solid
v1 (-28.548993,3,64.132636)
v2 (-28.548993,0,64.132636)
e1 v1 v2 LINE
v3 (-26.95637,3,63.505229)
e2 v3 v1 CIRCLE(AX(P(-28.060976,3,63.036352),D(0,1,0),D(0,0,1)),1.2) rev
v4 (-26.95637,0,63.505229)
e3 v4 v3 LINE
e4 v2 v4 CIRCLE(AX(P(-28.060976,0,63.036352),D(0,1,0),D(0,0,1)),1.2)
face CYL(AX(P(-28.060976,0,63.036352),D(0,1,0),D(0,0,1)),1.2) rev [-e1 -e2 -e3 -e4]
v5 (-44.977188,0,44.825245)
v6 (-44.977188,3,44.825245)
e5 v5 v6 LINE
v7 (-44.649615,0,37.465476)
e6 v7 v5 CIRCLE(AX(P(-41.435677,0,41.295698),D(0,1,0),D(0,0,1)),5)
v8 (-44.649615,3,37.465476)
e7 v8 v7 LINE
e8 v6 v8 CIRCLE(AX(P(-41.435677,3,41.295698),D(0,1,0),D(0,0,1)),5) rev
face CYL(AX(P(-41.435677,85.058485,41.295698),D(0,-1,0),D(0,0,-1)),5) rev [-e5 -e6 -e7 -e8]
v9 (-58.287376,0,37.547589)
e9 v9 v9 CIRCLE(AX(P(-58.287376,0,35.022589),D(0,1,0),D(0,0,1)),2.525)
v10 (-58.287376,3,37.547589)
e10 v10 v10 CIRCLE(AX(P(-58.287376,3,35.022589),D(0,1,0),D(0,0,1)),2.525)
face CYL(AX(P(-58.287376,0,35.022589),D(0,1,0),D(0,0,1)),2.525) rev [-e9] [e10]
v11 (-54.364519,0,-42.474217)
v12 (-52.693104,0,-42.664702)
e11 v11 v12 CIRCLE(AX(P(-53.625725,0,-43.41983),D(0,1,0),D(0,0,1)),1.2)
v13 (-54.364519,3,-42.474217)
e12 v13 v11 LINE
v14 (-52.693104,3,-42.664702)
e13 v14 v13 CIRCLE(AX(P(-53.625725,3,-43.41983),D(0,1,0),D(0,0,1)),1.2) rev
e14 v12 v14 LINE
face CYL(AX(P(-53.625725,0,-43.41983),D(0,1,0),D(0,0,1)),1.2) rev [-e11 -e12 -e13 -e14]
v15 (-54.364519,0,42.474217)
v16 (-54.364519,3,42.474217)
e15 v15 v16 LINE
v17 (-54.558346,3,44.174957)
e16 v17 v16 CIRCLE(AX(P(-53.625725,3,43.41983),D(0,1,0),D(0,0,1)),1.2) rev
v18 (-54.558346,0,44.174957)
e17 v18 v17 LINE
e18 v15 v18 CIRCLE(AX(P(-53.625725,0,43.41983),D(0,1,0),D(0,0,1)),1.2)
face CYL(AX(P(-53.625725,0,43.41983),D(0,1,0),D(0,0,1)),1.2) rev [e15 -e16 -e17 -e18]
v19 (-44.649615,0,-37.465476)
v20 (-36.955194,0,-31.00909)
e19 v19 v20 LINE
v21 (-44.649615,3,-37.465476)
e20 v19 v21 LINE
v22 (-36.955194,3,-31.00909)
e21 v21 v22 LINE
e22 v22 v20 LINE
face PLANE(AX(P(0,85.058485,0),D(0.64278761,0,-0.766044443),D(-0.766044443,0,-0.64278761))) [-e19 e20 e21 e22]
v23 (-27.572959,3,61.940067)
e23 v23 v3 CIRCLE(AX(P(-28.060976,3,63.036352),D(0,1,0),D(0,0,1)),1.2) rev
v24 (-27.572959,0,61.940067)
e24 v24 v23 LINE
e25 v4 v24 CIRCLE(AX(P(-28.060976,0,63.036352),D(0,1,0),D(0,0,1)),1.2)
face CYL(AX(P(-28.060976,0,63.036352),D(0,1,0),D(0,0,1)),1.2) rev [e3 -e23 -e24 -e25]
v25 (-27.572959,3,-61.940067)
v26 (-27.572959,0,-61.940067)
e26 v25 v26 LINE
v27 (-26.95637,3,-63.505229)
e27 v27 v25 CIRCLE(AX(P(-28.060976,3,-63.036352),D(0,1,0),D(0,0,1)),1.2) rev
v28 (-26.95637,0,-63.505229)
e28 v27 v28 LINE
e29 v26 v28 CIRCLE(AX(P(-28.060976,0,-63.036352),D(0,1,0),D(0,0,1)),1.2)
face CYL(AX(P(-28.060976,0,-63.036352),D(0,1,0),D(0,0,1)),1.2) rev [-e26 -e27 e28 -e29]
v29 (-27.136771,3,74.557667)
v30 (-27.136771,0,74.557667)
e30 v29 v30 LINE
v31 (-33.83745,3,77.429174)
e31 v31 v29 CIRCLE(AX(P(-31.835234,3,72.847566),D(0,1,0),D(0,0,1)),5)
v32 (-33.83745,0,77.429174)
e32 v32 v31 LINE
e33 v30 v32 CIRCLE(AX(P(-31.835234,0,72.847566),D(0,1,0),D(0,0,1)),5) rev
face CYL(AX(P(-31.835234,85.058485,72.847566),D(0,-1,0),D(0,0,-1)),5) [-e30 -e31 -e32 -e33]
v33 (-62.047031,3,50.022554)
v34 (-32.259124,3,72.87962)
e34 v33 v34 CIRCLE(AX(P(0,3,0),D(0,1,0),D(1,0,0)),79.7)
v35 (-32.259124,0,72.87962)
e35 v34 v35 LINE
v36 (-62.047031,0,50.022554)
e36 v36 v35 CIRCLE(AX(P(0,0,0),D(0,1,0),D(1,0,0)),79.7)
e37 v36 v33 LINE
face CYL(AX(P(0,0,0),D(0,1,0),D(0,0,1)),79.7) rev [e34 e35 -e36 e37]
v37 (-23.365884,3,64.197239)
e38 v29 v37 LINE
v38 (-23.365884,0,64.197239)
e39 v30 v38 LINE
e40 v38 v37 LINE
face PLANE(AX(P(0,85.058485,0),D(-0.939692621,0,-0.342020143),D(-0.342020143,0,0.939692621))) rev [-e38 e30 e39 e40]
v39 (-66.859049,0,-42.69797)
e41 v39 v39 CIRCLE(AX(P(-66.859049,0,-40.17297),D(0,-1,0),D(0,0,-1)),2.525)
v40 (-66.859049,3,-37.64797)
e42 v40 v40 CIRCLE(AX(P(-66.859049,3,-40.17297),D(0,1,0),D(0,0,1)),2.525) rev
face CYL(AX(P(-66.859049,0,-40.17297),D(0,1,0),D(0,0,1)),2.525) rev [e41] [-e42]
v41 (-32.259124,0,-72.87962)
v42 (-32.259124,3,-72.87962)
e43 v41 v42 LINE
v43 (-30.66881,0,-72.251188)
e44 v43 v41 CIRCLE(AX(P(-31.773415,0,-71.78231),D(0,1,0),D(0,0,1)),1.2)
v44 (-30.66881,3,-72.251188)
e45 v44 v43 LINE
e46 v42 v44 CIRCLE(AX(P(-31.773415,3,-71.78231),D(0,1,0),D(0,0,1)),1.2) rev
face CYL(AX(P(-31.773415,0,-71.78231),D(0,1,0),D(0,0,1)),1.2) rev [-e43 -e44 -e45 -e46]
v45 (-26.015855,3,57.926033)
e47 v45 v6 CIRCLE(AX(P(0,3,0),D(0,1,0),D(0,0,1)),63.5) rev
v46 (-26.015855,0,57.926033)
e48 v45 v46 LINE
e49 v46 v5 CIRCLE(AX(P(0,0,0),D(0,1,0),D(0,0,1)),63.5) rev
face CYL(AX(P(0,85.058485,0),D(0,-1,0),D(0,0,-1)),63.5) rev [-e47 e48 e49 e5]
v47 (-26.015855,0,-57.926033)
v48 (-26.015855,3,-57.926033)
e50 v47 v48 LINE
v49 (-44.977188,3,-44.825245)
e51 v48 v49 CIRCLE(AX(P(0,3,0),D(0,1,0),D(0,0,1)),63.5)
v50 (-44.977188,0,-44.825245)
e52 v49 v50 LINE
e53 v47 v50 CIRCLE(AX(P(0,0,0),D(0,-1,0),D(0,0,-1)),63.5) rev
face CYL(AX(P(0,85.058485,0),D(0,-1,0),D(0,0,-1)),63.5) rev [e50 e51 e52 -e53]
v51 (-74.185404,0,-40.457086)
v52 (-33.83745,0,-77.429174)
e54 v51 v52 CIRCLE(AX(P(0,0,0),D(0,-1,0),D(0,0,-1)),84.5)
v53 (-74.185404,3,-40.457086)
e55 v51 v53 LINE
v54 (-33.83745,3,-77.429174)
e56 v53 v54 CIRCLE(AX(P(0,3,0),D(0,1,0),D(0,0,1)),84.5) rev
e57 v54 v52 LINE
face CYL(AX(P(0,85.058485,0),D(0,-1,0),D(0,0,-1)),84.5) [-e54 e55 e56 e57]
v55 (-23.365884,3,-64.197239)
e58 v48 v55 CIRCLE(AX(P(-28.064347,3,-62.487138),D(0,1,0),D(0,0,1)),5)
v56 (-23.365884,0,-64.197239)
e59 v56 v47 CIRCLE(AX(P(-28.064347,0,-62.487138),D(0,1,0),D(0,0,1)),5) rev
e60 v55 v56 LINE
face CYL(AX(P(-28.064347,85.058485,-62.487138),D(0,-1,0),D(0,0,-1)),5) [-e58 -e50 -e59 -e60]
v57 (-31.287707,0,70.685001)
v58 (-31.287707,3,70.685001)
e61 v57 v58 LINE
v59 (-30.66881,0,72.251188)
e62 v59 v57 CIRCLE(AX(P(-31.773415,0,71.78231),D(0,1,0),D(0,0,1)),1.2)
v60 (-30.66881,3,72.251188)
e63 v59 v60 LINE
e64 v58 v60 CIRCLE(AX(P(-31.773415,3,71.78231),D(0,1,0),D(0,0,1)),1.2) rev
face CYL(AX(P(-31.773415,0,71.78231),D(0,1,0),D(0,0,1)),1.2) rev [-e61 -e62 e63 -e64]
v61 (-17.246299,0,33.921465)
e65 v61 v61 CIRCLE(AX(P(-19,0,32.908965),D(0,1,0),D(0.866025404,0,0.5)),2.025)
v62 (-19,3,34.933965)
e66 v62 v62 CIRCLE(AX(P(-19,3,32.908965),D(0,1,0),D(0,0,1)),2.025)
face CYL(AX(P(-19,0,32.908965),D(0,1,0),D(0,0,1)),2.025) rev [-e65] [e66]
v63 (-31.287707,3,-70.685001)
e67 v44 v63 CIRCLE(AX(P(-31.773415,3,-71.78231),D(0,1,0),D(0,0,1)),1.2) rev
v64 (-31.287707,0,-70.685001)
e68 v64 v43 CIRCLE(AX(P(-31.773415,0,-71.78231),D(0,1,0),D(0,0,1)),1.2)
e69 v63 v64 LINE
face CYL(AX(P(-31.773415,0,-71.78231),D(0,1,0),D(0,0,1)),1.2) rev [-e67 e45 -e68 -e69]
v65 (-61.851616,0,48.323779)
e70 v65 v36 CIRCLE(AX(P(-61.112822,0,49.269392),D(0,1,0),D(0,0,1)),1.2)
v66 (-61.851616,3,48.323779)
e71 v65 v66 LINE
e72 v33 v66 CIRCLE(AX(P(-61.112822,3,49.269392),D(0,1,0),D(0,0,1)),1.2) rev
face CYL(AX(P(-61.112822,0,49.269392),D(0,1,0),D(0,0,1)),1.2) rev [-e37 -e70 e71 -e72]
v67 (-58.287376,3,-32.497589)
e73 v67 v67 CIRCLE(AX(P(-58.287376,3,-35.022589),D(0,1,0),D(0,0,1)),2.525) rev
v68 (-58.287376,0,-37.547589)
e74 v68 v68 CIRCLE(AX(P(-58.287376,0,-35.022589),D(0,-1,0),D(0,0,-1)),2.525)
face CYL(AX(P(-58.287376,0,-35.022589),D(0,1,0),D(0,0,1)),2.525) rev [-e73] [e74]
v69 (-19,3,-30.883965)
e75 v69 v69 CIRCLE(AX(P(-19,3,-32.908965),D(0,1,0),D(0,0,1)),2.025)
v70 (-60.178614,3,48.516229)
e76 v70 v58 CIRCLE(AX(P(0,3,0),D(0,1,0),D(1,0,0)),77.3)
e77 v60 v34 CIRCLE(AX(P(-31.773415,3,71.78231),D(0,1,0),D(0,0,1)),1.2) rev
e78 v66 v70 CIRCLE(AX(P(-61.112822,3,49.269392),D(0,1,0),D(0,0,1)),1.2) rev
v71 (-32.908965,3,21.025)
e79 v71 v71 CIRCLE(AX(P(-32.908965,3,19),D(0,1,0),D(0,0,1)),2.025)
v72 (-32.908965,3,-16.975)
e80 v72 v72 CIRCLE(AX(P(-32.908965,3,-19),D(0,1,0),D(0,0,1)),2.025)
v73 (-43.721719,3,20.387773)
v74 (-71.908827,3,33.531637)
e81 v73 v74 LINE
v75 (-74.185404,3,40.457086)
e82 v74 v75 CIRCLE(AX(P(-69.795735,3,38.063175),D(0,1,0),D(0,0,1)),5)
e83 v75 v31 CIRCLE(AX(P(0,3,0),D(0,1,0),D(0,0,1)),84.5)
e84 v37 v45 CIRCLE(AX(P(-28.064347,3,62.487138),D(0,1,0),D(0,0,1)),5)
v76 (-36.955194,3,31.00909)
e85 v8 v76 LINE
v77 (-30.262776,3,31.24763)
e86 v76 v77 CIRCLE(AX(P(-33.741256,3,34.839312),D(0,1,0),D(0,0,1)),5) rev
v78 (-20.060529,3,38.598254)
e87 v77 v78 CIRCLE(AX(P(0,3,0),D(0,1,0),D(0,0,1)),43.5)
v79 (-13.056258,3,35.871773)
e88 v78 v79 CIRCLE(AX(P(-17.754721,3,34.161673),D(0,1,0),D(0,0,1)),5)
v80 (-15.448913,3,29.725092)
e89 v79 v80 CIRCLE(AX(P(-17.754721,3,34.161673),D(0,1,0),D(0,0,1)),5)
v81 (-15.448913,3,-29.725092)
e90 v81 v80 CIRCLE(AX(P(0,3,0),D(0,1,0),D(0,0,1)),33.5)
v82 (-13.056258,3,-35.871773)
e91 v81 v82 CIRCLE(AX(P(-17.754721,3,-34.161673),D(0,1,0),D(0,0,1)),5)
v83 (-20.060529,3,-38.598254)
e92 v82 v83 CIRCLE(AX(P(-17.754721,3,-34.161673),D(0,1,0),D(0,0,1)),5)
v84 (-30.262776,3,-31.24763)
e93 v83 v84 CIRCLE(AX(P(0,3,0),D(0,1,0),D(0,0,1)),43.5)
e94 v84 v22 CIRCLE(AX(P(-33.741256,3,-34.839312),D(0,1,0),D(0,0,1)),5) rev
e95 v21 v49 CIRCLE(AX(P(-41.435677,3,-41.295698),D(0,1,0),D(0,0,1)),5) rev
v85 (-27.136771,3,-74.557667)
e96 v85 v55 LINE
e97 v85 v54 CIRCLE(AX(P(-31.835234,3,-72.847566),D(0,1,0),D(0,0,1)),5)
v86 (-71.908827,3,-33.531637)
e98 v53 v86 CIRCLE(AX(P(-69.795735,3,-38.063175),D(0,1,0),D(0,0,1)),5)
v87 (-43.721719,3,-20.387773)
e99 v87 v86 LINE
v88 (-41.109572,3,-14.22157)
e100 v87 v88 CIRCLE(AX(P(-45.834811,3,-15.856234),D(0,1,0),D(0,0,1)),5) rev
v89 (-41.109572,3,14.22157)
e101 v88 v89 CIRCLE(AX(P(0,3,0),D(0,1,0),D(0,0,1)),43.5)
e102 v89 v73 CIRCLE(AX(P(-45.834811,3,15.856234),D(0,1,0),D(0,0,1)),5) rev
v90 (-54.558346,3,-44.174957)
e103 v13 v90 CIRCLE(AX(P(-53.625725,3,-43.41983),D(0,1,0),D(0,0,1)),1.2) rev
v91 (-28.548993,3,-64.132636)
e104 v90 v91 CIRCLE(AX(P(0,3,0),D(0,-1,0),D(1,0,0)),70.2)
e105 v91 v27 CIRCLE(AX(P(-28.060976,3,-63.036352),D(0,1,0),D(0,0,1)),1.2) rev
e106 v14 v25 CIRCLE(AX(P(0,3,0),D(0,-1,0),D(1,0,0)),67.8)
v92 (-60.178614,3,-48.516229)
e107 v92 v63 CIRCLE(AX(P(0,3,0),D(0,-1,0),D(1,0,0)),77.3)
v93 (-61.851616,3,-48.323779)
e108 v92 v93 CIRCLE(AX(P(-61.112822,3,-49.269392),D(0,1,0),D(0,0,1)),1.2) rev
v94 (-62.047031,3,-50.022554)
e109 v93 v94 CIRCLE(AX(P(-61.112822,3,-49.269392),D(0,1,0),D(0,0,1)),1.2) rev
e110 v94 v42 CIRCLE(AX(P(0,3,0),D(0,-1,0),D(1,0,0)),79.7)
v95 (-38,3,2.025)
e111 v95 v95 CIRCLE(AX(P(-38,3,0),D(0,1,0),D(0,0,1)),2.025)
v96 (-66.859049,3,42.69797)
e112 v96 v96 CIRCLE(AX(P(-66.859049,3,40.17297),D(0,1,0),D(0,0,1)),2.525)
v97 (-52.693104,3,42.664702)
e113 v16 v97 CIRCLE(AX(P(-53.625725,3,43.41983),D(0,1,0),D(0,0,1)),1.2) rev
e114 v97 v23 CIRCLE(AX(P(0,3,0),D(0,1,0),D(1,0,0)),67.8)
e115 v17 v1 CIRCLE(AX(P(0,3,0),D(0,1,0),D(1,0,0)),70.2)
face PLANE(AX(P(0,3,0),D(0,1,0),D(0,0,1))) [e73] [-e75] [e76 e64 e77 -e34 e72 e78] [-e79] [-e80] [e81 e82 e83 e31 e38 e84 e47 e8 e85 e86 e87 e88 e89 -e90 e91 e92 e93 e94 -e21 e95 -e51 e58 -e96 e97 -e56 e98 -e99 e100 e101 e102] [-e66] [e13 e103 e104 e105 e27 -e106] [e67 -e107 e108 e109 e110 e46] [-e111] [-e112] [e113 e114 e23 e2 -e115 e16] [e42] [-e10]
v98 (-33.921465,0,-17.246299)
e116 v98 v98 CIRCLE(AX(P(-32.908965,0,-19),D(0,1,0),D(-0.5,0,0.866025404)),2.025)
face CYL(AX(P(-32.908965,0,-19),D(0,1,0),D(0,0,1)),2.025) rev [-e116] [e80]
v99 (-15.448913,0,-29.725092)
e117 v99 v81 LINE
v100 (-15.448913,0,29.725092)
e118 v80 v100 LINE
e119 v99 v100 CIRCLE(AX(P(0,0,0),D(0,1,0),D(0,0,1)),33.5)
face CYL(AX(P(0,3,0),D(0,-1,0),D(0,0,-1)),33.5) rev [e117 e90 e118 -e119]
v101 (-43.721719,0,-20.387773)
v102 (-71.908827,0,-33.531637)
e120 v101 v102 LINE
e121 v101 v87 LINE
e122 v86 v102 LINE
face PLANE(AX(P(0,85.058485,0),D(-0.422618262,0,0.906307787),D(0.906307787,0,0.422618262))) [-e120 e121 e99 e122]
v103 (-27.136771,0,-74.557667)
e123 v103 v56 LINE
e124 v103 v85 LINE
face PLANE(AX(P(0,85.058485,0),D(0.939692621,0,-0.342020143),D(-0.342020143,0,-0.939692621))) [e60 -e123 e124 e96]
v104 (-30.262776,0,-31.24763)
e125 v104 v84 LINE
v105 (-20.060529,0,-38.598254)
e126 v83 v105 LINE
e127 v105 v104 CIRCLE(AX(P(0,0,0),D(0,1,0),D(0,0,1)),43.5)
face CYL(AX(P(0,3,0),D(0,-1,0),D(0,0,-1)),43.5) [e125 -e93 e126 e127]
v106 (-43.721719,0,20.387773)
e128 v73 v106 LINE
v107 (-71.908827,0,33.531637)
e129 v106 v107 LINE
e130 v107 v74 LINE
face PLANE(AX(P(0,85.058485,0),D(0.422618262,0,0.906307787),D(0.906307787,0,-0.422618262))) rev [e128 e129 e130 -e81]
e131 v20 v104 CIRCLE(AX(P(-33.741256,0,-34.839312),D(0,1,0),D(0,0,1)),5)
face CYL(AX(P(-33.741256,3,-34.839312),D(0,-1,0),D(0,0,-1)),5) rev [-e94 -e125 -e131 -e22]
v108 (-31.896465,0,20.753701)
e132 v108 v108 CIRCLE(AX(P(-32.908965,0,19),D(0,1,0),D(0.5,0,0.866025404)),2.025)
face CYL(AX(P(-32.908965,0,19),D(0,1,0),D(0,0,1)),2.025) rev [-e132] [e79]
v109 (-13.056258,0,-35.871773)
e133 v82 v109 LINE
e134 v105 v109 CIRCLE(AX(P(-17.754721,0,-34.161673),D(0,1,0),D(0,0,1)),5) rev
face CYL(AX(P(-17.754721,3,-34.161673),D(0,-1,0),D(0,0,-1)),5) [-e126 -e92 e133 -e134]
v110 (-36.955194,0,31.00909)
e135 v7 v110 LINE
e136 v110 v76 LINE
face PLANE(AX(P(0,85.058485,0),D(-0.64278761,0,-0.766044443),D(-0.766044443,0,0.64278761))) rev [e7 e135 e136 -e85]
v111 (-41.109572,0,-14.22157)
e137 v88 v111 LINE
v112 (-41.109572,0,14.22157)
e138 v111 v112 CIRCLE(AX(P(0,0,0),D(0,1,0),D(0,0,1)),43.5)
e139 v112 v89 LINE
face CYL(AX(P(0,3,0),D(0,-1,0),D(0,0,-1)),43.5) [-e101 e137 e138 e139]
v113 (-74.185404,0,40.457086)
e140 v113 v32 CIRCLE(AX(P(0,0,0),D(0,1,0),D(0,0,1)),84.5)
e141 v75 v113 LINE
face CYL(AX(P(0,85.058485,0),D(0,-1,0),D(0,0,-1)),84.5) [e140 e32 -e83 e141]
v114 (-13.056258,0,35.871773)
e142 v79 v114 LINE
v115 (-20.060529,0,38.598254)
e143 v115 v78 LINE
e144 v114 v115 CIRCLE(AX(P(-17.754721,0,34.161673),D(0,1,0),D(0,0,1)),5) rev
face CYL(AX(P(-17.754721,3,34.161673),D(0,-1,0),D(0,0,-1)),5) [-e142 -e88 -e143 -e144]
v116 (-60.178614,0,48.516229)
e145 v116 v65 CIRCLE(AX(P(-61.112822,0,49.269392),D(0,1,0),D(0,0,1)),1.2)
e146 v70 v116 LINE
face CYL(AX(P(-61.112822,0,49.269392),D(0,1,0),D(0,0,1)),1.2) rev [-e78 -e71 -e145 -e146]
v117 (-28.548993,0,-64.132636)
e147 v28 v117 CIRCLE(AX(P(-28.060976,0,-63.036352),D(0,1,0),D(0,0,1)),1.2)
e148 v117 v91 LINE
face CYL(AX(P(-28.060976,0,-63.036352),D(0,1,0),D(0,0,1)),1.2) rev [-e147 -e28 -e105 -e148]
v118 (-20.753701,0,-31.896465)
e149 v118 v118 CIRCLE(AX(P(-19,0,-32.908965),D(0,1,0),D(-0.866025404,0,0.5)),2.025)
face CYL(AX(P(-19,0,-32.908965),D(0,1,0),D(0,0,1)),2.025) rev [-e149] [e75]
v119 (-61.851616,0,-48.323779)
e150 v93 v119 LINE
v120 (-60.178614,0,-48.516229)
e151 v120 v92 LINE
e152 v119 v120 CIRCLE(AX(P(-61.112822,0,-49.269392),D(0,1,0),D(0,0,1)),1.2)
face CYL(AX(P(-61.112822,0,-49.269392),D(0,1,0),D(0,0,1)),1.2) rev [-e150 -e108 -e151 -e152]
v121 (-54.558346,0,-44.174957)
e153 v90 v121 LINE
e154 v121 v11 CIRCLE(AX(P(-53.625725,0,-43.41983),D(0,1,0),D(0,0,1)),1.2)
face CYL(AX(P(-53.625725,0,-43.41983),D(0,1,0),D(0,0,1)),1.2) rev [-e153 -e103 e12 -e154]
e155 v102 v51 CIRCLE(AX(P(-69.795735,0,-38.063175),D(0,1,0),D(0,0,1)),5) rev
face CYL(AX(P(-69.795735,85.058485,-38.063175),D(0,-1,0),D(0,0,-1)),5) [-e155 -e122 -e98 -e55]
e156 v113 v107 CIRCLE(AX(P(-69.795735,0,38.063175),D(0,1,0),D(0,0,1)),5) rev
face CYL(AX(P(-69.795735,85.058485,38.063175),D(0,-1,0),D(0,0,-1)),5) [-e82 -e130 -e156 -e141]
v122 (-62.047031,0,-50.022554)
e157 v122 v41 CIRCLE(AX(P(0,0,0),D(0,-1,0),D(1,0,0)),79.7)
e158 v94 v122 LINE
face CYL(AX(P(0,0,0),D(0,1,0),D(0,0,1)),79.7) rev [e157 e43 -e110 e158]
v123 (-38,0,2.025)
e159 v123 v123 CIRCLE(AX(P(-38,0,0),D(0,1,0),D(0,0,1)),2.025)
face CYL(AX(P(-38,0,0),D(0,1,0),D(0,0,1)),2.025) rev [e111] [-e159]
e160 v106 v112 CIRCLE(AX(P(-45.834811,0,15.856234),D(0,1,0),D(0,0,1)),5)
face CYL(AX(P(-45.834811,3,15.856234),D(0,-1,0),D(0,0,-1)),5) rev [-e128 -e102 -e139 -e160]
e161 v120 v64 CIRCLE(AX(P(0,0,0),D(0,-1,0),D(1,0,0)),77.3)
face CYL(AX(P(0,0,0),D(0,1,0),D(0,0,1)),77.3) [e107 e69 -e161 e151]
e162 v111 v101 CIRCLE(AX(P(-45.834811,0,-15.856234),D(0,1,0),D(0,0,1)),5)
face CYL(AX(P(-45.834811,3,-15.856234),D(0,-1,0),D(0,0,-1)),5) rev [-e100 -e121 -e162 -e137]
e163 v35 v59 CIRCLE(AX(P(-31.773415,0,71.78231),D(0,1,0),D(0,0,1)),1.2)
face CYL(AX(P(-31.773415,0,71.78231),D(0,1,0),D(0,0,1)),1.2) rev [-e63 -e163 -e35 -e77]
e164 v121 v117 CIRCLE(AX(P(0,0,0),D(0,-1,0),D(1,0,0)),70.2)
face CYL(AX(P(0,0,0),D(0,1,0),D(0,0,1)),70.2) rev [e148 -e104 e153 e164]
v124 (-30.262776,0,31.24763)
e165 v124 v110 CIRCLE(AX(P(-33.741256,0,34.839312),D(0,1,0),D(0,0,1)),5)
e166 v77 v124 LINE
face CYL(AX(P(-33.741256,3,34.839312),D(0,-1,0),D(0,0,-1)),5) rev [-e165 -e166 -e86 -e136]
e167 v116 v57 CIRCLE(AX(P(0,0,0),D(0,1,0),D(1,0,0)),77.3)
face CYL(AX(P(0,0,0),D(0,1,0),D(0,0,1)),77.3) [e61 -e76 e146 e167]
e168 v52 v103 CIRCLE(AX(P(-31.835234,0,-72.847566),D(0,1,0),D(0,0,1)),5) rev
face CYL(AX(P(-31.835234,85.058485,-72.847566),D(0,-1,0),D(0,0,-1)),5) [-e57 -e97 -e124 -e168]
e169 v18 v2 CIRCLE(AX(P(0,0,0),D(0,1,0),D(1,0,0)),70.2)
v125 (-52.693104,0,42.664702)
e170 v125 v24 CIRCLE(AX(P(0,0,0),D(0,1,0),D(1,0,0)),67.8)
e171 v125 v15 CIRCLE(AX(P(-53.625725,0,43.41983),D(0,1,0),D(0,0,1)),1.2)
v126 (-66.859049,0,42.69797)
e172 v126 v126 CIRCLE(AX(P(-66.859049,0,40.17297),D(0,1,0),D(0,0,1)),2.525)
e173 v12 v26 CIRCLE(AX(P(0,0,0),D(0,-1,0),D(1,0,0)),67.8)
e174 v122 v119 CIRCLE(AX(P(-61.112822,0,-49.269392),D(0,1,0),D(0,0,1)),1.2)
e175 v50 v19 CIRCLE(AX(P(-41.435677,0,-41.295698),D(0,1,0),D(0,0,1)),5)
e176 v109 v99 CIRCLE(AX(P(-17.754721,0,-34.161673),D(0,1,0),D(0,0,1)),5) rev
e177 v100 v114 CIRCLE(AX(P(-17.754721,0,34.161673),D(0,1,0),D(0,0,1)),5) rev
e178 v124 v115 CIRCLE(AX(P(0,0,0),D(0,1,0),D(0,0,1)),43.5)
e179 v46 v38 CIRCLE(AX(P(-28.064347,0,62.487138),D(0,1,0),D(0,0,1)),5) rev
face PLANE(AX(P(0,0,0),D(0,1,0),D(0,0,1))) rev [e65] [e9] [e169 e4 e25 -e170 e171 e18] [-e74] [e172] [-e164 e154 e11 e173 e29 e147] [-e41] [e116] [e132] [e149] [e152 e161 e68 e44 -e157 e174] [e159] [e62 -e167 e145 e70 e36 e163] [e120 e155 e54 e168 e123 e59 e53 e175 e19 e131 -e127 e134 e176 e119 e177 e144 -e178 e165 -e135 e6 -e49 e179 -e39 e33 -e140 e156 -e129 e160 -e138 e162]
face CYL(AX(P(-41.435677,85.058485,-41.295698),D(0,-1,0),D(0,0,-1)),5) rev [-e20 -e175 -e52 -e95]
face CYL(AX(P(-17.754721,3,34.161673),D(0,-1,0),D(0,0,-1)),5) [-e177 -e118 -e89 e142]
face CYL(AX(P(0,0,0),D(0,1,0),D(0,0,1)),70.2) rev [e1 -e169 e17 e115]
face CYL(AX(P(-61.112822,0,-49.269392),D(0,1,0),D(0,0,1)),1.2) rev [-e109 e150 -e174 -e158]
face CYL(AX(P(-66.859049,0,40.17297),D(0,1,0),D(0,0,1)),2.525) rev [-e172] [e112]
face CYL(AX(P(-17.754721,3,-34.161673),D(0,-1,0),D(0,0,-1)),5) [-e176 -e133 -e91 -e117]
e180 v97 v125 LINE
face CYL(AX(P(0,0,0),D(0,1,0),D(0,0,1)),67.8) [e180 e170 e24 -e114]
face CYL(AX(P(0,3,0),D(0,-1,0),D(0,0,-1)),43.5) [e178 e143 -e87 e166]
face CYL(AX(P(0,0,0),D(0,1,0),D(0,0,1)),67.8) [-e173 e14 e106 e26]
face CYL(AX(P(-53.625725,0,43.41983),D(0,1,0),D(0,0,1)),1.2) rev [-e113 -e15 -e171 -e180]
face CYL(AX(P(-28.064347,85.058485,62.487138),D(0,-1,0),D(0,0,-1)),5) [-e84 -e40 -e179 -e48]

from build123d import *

# Parameters (mm, degrees)
SKETCH1_R               = 43.5
SKETCH1_R_2             = 33.5
BOSS_EXTRUDE1_DEPTH     = 3
SKETCH3_R               = 2.025
CUT_EXTRUDE2_DEPTH      = 62.591395503
CIRPATTERN1_COUNT       = 12
CUT_EXTRUDE1_DEPTH      = 62.591395503
BOSS_EXTRUDE2_DEPTH     = 3
CUT_EXTRUDE_THIN1_DEPTH = 3
FILLET1_R               = 1.2
FILLET2_R               = 5
SKETCH6_R               = 2.525
CUT_EXTRUDE3_DEPTH      = 108.998410492
MIRROR4_OUTLINE_R       = 2.525
MIRROR4_DEPTH           = 3


# Read off the part's stored shape, not the designer's step: Mirror4
with BuildPart() as part:
    # Sketch1 → Boss-Extrude1 (new body)
    with BuildSketch(Plane(origin=(0, 0, 0), x_dir=(1, 0, 0), z_dir=(0, 1, 0))):
        with Locations(Location((0, 0, 0), (0, 0, 270))):
            Circle(SKETCH1_R)
        with Locations(Location((0, 0, 0), (0, 0, 270))):
            Circle(SKETCH1_R_2, mode=Mode.SUBTRACT)
    extrude(amount=BOSS_EXTRUDE1_DEPTH)

    # Sketch3 → Cut-Extrude2 (cut, symmetric)
    with BuildSketch(Plane(origin=(0, 3, 0), x_dir=(1, 0, 0), z_dir=(0, 1, 0))):
        with Locations(Location((-38, 0, 0), (0, 0, 270))):
            Circle(SKETCH3_R)
    cut_extrude2 = extrude(amount=CUT_EXTRUDE2_DEPTH, both=True, mode=Mode.SUBTRACT)

    # CirPattern1: Cut-Extrude2 ×12 about axis
    cirpattern1_axis = Axis((0, 0, 0), (0, 1, 0))
    for i in range(1, CIRPATTERN1_COUNT):
        add(cut_extrude2.rotate(cirpattern1_axis, i * 360 / CIRPATTERN1_COUNT), mode=Mode.SUBTRACT)

    # Sketch2 → Cut-Extrude1 (cut, symmetric)
    with BuildSketch(Plane(origin=(0, 3, 0), x_dir=(1, 0, 0), z_dir=(0, 1, 0))):
        with BuildLine():
            Line((0, 0), (43.5, 0))
            ThreePointArc((43.5, 0), (24.950574981, -35.633113927), (-14.877876235, -40.876629004))
            Line((-14.877876235, -40.876629004), (0, 0))
        make_face()
    cut_extrude1 = extrude(amount=CUT_EXTRUDE1_DEPTH, both=True, mode=Mode.SUBTRACT)

    # Mirror1: Cut-Extrude1 across plane
    add(cut_extrude1.mirror(Plane.XY), mode=Mode.SUBTRACT)

    # Sketch4 → Boss-Extrude2 (add)
    with BuildSketch(Plane(origin=(0, 0, 0), x_dir=(1, 0, 0), z_dir=(0, 1, 0))):
        with BuildLine():
            ThreePointArc((-33.322933276, -27.961261021), (-36.687527893, -23.372532963), (-39.424388736, -18.383894386))
            Line((-39.424388736, -18.383894386), (-57.550544477, -26.836259621))
            Line((-57.550544477, -26.836259621), (-76.583008005, -35.711243117))
            ThreePointArc((-76.583008005, -35.711243117), (-57.087372544, -62.29993496), (-28.900702111, -79.404026456))
            Line((-28.900702111, -79.404026456), (-21.718279101, -59.67048142))
            ThreePointArc((-21.718279101, -59.67048142), (-36.422103708, -52.016154812), (-48.643822138, -40.817013215))
            Line((-48.643822138, -40.817013215), (-33.322933276, -27.961261021))
        make_face()
    extrude(amount=BOSS_EXTRUDE2_DEPTH)

    # Sketch5 → Cut-Extrude-Thin1 (cut)
    with BuildSketch(Plane(origin=(0, 3, 0), x_dir=(1, 0, 0), z_dir=(0, 1, 0))):
        with BuildLine():
            ThreePointArc((-55.318354903, -43.219435568), (-42.735052316, -55.693404488), (-27.42932522, -64.619440712))
            Line((-27.42932522, -64.619440712), (-26.491570512, -62.410229064))
            ThreePointArc((-26.491570512, -62.410229064), (-41.274024887, -53.789356472), (-53.427129095, -41.741848027))
            Line((-53.427129095, -41.741848027), (-55.318354903, -43.219435568))
        make_face()
        with BuildLine():
            ThreePointArc((-62.804457062, -49.068219583), (-48.518285892, -63.230261221), (-31.141270941, -73.36423682))
            Line((-31.141270941, -73.36423682), (-30.203516232, -71.155025172))
            ThreePointArc((-30.203516232, -71.155025172), (-47.057258462, -61.326213205), (-60.913231254, -47.590632043))
            Line((-60.913231254, -47.590632043), (-62.804457062, -49.068219583))
        make_face()
    extrude(amount=-CUT_EXTRUDE_THIN1_DEPTH, mode=Mode.SUBTRACT)

    # Fillet1
    fillet1_edges = [part.edges().sort_by_distance(p)[0] for p in [
        (-55.318354903, 1.5, 43.219435568),
        (-62.804457062, 1.5, 49.068219583),
        (-53.427129095, 1.5, 41.741848027),
        (-60.913231254, 1.5, 47.590632043),
        (-26.491570512, 1.5, 62.410229064),
        (-30.203516232, 1.5, 71.155025172),
        (-27.42932522, 1.5, 64.619440712),
        (-31.141270941, 1.5, 73.36423682),
    ]]
    fillet(fillet1_edges, radius=FILLET1_R - 0.0001)  # a hair under: the kernel refuses the full size

    # Fillet2
    fillet2_edges = [part.edges().sort_by_distance(p)[0] for p in [
        (-14.877876235, 1.5, -40.876629004),
        (-11.457674801, 1.5, -31.479702796),
        (-11.457674801, 1.5, 31.479702796),
        (-14.877876235, 1.5, 40.876629004),
        (-39.424388736, 1.5, 18.383894386),
        (-76.583008005, 1.5, 35.711243117),
        (-28.900702111, 1.5, 79.404026456),
        (-21.718279101, 1.5, 59.67048142),
        (-33.322933276, 1.5, 27.961261021),
        (-48.643822138, 1.5, 40.817013215),
    ]]
    fillet(fillet2_edges, radius=FILLET2_R - 0.0001)  # a hair under: the kernel refuses the full size

    # Sketch6 → Cut-Extrude3 (cut, symmetric)
    with BuildSketch(Plane(origin=(0, 3, 0), x_dir=(1, 0, 0), z_dir=(0, 1, 0))):
        with Locations(Location((-58.287376448, -35.022589094, 0), (0, 0, 270))):
            Circle(SKETCH6_R)
        with Locations(Location((-66.859049455, -40.172969843, 0), (0, 0, 270))):
            Circle(SKETCH6_R)
    extrude(amount=CUT_EXTRUDE3_DEPTH, both=True, mode=Mode.SUBTRACT)

    # Mirror4 outline → Mirror4 (add)
    with BuildSketch(Plane(origin=(0, 0, 0), x_dir=(1, 0, 0), z_dir=(0, 1, 0))):
        with BuildLine():
            ThreePointArc((-33.837450466, 77.42917374), (-57.087372544, 62.29993496), (-74.185404229, 40.457085898))
            ThreePointArc((-74.185404229, 40.457085898), (-74.545675834, 36.50174496), (-71.908826648, 33.531636555))
            Line((-71.908826648, 33.531636555), (-43.721719229, 20.387772504))
            ThreePointArc((-43.721719229, 20.387772504), (-41.230877439, 17.806566879), (-41.109572338, 14.221570314))
            ThreePointArc((-41.109572338, 14.221570314), (-36.687527893, 23.372532963), (-30.262775922, 31.247630206))
            ThreePointArc((-30.262775922, 31.247630206), (-33.563151977, 29.842484947), (-36.955193962, 31.009089623))
            Line((-36.955193962, 31.009089623), (-44.649615181, 37.46547563))
            ThreePointArc((-44.649615181, 37.46547563), (-46.430731946, 41.073375084), (-44.977187998, 44.82524467))
            ThreePointArc((-44.977187998, 44.82524467), (-36.095854194, 52.243079063), (-26.015854641, 57.926033071))
            ThreePointArc((-26.015854641, 57.926033071), (-23.458659602, 60.540951414), (-23.365884028, 64.197238753))
            Line((-23.365884028, 64.197238753), (-27.136771358, 74.557666543))
            ThreePointArc((-27.136771358, 74.557666543), (-29.865761055, 77.443343725), (-33.837450466, 77.42917374))
        make_face()
        with Locations((-66.859049455, 40.172969843)):
            Circle(MIRROR4_OUTLINE_R, mode=Mode.SUBTRACT)
        with Locations((-58.287376448, 35.022589094)):
            Circle(MIRROR4_OUTLINE_R, mode=Mode.SUBTRACT)
        with BuildLine():
            ThreePointArc((-54.558346188, 44.174957399), (-42.735052316, 55.693404488), (-28.548993164, 64.132635914))
            ThreePointArc((-28.548993164, 64.132635914), (-27.6211406, 64.152839182), (-26.956370363, 63.505228894))
            ThreePointArc((-26.956370363, 63.505228894), (-26.944488545, 62.596515953), (-27.57295921, 61.940067165))
            ThreePointArc((-27.57295921, 61.940067165), (-41.274024887, 53.789356472), (-52.693103583, 42.664702445))
            ThreePointArc((-52.693103583, 42.664702445), (-53.489844598, 42.227547847), (-54.364518656, 42.474217018))
            ThreePointArc((-54.364518656, 42.474217018), (-54.818006961, 43.283949635), (-54.558346188, 44.174957399))
        make_face(mode=Mode.SUBTRACT)
        with BuildLine():
            ThreePointArc((-62.0470311, 50.02255423), (-48.518285891, 63.230261221), (-32.259123686, 72.879619504))
            ThreePointArc((-32.259123686, 72.879619504), (-31.332405, 72.898334407), (-30.668809601, 72.251187656))
            ThreePointArc((-30.668809601, 72.251187656), (-30.657391319, 71.341299876), (-31.287707164, 70.685001099))
            ThreePointArc((-31.287707164, 70.685001099), (-47.057258463, 61.326213205), (-60.178613602, 48.516228883))
            ThreePointArc((-60.178613602, 48.516228883), (-60.975687285, 48.077253152), (-61.851616121, 48.323778652))
            ThreePointArc((-61.851616121, 48.323778652), (-62.304960755, 49.13225649), (-62.0470311, 50.02255423))
        make_face(mode=Mode.SUBTRACT)
    extrude(amount=MIRROR4_DEPTH)


solid = part.part
